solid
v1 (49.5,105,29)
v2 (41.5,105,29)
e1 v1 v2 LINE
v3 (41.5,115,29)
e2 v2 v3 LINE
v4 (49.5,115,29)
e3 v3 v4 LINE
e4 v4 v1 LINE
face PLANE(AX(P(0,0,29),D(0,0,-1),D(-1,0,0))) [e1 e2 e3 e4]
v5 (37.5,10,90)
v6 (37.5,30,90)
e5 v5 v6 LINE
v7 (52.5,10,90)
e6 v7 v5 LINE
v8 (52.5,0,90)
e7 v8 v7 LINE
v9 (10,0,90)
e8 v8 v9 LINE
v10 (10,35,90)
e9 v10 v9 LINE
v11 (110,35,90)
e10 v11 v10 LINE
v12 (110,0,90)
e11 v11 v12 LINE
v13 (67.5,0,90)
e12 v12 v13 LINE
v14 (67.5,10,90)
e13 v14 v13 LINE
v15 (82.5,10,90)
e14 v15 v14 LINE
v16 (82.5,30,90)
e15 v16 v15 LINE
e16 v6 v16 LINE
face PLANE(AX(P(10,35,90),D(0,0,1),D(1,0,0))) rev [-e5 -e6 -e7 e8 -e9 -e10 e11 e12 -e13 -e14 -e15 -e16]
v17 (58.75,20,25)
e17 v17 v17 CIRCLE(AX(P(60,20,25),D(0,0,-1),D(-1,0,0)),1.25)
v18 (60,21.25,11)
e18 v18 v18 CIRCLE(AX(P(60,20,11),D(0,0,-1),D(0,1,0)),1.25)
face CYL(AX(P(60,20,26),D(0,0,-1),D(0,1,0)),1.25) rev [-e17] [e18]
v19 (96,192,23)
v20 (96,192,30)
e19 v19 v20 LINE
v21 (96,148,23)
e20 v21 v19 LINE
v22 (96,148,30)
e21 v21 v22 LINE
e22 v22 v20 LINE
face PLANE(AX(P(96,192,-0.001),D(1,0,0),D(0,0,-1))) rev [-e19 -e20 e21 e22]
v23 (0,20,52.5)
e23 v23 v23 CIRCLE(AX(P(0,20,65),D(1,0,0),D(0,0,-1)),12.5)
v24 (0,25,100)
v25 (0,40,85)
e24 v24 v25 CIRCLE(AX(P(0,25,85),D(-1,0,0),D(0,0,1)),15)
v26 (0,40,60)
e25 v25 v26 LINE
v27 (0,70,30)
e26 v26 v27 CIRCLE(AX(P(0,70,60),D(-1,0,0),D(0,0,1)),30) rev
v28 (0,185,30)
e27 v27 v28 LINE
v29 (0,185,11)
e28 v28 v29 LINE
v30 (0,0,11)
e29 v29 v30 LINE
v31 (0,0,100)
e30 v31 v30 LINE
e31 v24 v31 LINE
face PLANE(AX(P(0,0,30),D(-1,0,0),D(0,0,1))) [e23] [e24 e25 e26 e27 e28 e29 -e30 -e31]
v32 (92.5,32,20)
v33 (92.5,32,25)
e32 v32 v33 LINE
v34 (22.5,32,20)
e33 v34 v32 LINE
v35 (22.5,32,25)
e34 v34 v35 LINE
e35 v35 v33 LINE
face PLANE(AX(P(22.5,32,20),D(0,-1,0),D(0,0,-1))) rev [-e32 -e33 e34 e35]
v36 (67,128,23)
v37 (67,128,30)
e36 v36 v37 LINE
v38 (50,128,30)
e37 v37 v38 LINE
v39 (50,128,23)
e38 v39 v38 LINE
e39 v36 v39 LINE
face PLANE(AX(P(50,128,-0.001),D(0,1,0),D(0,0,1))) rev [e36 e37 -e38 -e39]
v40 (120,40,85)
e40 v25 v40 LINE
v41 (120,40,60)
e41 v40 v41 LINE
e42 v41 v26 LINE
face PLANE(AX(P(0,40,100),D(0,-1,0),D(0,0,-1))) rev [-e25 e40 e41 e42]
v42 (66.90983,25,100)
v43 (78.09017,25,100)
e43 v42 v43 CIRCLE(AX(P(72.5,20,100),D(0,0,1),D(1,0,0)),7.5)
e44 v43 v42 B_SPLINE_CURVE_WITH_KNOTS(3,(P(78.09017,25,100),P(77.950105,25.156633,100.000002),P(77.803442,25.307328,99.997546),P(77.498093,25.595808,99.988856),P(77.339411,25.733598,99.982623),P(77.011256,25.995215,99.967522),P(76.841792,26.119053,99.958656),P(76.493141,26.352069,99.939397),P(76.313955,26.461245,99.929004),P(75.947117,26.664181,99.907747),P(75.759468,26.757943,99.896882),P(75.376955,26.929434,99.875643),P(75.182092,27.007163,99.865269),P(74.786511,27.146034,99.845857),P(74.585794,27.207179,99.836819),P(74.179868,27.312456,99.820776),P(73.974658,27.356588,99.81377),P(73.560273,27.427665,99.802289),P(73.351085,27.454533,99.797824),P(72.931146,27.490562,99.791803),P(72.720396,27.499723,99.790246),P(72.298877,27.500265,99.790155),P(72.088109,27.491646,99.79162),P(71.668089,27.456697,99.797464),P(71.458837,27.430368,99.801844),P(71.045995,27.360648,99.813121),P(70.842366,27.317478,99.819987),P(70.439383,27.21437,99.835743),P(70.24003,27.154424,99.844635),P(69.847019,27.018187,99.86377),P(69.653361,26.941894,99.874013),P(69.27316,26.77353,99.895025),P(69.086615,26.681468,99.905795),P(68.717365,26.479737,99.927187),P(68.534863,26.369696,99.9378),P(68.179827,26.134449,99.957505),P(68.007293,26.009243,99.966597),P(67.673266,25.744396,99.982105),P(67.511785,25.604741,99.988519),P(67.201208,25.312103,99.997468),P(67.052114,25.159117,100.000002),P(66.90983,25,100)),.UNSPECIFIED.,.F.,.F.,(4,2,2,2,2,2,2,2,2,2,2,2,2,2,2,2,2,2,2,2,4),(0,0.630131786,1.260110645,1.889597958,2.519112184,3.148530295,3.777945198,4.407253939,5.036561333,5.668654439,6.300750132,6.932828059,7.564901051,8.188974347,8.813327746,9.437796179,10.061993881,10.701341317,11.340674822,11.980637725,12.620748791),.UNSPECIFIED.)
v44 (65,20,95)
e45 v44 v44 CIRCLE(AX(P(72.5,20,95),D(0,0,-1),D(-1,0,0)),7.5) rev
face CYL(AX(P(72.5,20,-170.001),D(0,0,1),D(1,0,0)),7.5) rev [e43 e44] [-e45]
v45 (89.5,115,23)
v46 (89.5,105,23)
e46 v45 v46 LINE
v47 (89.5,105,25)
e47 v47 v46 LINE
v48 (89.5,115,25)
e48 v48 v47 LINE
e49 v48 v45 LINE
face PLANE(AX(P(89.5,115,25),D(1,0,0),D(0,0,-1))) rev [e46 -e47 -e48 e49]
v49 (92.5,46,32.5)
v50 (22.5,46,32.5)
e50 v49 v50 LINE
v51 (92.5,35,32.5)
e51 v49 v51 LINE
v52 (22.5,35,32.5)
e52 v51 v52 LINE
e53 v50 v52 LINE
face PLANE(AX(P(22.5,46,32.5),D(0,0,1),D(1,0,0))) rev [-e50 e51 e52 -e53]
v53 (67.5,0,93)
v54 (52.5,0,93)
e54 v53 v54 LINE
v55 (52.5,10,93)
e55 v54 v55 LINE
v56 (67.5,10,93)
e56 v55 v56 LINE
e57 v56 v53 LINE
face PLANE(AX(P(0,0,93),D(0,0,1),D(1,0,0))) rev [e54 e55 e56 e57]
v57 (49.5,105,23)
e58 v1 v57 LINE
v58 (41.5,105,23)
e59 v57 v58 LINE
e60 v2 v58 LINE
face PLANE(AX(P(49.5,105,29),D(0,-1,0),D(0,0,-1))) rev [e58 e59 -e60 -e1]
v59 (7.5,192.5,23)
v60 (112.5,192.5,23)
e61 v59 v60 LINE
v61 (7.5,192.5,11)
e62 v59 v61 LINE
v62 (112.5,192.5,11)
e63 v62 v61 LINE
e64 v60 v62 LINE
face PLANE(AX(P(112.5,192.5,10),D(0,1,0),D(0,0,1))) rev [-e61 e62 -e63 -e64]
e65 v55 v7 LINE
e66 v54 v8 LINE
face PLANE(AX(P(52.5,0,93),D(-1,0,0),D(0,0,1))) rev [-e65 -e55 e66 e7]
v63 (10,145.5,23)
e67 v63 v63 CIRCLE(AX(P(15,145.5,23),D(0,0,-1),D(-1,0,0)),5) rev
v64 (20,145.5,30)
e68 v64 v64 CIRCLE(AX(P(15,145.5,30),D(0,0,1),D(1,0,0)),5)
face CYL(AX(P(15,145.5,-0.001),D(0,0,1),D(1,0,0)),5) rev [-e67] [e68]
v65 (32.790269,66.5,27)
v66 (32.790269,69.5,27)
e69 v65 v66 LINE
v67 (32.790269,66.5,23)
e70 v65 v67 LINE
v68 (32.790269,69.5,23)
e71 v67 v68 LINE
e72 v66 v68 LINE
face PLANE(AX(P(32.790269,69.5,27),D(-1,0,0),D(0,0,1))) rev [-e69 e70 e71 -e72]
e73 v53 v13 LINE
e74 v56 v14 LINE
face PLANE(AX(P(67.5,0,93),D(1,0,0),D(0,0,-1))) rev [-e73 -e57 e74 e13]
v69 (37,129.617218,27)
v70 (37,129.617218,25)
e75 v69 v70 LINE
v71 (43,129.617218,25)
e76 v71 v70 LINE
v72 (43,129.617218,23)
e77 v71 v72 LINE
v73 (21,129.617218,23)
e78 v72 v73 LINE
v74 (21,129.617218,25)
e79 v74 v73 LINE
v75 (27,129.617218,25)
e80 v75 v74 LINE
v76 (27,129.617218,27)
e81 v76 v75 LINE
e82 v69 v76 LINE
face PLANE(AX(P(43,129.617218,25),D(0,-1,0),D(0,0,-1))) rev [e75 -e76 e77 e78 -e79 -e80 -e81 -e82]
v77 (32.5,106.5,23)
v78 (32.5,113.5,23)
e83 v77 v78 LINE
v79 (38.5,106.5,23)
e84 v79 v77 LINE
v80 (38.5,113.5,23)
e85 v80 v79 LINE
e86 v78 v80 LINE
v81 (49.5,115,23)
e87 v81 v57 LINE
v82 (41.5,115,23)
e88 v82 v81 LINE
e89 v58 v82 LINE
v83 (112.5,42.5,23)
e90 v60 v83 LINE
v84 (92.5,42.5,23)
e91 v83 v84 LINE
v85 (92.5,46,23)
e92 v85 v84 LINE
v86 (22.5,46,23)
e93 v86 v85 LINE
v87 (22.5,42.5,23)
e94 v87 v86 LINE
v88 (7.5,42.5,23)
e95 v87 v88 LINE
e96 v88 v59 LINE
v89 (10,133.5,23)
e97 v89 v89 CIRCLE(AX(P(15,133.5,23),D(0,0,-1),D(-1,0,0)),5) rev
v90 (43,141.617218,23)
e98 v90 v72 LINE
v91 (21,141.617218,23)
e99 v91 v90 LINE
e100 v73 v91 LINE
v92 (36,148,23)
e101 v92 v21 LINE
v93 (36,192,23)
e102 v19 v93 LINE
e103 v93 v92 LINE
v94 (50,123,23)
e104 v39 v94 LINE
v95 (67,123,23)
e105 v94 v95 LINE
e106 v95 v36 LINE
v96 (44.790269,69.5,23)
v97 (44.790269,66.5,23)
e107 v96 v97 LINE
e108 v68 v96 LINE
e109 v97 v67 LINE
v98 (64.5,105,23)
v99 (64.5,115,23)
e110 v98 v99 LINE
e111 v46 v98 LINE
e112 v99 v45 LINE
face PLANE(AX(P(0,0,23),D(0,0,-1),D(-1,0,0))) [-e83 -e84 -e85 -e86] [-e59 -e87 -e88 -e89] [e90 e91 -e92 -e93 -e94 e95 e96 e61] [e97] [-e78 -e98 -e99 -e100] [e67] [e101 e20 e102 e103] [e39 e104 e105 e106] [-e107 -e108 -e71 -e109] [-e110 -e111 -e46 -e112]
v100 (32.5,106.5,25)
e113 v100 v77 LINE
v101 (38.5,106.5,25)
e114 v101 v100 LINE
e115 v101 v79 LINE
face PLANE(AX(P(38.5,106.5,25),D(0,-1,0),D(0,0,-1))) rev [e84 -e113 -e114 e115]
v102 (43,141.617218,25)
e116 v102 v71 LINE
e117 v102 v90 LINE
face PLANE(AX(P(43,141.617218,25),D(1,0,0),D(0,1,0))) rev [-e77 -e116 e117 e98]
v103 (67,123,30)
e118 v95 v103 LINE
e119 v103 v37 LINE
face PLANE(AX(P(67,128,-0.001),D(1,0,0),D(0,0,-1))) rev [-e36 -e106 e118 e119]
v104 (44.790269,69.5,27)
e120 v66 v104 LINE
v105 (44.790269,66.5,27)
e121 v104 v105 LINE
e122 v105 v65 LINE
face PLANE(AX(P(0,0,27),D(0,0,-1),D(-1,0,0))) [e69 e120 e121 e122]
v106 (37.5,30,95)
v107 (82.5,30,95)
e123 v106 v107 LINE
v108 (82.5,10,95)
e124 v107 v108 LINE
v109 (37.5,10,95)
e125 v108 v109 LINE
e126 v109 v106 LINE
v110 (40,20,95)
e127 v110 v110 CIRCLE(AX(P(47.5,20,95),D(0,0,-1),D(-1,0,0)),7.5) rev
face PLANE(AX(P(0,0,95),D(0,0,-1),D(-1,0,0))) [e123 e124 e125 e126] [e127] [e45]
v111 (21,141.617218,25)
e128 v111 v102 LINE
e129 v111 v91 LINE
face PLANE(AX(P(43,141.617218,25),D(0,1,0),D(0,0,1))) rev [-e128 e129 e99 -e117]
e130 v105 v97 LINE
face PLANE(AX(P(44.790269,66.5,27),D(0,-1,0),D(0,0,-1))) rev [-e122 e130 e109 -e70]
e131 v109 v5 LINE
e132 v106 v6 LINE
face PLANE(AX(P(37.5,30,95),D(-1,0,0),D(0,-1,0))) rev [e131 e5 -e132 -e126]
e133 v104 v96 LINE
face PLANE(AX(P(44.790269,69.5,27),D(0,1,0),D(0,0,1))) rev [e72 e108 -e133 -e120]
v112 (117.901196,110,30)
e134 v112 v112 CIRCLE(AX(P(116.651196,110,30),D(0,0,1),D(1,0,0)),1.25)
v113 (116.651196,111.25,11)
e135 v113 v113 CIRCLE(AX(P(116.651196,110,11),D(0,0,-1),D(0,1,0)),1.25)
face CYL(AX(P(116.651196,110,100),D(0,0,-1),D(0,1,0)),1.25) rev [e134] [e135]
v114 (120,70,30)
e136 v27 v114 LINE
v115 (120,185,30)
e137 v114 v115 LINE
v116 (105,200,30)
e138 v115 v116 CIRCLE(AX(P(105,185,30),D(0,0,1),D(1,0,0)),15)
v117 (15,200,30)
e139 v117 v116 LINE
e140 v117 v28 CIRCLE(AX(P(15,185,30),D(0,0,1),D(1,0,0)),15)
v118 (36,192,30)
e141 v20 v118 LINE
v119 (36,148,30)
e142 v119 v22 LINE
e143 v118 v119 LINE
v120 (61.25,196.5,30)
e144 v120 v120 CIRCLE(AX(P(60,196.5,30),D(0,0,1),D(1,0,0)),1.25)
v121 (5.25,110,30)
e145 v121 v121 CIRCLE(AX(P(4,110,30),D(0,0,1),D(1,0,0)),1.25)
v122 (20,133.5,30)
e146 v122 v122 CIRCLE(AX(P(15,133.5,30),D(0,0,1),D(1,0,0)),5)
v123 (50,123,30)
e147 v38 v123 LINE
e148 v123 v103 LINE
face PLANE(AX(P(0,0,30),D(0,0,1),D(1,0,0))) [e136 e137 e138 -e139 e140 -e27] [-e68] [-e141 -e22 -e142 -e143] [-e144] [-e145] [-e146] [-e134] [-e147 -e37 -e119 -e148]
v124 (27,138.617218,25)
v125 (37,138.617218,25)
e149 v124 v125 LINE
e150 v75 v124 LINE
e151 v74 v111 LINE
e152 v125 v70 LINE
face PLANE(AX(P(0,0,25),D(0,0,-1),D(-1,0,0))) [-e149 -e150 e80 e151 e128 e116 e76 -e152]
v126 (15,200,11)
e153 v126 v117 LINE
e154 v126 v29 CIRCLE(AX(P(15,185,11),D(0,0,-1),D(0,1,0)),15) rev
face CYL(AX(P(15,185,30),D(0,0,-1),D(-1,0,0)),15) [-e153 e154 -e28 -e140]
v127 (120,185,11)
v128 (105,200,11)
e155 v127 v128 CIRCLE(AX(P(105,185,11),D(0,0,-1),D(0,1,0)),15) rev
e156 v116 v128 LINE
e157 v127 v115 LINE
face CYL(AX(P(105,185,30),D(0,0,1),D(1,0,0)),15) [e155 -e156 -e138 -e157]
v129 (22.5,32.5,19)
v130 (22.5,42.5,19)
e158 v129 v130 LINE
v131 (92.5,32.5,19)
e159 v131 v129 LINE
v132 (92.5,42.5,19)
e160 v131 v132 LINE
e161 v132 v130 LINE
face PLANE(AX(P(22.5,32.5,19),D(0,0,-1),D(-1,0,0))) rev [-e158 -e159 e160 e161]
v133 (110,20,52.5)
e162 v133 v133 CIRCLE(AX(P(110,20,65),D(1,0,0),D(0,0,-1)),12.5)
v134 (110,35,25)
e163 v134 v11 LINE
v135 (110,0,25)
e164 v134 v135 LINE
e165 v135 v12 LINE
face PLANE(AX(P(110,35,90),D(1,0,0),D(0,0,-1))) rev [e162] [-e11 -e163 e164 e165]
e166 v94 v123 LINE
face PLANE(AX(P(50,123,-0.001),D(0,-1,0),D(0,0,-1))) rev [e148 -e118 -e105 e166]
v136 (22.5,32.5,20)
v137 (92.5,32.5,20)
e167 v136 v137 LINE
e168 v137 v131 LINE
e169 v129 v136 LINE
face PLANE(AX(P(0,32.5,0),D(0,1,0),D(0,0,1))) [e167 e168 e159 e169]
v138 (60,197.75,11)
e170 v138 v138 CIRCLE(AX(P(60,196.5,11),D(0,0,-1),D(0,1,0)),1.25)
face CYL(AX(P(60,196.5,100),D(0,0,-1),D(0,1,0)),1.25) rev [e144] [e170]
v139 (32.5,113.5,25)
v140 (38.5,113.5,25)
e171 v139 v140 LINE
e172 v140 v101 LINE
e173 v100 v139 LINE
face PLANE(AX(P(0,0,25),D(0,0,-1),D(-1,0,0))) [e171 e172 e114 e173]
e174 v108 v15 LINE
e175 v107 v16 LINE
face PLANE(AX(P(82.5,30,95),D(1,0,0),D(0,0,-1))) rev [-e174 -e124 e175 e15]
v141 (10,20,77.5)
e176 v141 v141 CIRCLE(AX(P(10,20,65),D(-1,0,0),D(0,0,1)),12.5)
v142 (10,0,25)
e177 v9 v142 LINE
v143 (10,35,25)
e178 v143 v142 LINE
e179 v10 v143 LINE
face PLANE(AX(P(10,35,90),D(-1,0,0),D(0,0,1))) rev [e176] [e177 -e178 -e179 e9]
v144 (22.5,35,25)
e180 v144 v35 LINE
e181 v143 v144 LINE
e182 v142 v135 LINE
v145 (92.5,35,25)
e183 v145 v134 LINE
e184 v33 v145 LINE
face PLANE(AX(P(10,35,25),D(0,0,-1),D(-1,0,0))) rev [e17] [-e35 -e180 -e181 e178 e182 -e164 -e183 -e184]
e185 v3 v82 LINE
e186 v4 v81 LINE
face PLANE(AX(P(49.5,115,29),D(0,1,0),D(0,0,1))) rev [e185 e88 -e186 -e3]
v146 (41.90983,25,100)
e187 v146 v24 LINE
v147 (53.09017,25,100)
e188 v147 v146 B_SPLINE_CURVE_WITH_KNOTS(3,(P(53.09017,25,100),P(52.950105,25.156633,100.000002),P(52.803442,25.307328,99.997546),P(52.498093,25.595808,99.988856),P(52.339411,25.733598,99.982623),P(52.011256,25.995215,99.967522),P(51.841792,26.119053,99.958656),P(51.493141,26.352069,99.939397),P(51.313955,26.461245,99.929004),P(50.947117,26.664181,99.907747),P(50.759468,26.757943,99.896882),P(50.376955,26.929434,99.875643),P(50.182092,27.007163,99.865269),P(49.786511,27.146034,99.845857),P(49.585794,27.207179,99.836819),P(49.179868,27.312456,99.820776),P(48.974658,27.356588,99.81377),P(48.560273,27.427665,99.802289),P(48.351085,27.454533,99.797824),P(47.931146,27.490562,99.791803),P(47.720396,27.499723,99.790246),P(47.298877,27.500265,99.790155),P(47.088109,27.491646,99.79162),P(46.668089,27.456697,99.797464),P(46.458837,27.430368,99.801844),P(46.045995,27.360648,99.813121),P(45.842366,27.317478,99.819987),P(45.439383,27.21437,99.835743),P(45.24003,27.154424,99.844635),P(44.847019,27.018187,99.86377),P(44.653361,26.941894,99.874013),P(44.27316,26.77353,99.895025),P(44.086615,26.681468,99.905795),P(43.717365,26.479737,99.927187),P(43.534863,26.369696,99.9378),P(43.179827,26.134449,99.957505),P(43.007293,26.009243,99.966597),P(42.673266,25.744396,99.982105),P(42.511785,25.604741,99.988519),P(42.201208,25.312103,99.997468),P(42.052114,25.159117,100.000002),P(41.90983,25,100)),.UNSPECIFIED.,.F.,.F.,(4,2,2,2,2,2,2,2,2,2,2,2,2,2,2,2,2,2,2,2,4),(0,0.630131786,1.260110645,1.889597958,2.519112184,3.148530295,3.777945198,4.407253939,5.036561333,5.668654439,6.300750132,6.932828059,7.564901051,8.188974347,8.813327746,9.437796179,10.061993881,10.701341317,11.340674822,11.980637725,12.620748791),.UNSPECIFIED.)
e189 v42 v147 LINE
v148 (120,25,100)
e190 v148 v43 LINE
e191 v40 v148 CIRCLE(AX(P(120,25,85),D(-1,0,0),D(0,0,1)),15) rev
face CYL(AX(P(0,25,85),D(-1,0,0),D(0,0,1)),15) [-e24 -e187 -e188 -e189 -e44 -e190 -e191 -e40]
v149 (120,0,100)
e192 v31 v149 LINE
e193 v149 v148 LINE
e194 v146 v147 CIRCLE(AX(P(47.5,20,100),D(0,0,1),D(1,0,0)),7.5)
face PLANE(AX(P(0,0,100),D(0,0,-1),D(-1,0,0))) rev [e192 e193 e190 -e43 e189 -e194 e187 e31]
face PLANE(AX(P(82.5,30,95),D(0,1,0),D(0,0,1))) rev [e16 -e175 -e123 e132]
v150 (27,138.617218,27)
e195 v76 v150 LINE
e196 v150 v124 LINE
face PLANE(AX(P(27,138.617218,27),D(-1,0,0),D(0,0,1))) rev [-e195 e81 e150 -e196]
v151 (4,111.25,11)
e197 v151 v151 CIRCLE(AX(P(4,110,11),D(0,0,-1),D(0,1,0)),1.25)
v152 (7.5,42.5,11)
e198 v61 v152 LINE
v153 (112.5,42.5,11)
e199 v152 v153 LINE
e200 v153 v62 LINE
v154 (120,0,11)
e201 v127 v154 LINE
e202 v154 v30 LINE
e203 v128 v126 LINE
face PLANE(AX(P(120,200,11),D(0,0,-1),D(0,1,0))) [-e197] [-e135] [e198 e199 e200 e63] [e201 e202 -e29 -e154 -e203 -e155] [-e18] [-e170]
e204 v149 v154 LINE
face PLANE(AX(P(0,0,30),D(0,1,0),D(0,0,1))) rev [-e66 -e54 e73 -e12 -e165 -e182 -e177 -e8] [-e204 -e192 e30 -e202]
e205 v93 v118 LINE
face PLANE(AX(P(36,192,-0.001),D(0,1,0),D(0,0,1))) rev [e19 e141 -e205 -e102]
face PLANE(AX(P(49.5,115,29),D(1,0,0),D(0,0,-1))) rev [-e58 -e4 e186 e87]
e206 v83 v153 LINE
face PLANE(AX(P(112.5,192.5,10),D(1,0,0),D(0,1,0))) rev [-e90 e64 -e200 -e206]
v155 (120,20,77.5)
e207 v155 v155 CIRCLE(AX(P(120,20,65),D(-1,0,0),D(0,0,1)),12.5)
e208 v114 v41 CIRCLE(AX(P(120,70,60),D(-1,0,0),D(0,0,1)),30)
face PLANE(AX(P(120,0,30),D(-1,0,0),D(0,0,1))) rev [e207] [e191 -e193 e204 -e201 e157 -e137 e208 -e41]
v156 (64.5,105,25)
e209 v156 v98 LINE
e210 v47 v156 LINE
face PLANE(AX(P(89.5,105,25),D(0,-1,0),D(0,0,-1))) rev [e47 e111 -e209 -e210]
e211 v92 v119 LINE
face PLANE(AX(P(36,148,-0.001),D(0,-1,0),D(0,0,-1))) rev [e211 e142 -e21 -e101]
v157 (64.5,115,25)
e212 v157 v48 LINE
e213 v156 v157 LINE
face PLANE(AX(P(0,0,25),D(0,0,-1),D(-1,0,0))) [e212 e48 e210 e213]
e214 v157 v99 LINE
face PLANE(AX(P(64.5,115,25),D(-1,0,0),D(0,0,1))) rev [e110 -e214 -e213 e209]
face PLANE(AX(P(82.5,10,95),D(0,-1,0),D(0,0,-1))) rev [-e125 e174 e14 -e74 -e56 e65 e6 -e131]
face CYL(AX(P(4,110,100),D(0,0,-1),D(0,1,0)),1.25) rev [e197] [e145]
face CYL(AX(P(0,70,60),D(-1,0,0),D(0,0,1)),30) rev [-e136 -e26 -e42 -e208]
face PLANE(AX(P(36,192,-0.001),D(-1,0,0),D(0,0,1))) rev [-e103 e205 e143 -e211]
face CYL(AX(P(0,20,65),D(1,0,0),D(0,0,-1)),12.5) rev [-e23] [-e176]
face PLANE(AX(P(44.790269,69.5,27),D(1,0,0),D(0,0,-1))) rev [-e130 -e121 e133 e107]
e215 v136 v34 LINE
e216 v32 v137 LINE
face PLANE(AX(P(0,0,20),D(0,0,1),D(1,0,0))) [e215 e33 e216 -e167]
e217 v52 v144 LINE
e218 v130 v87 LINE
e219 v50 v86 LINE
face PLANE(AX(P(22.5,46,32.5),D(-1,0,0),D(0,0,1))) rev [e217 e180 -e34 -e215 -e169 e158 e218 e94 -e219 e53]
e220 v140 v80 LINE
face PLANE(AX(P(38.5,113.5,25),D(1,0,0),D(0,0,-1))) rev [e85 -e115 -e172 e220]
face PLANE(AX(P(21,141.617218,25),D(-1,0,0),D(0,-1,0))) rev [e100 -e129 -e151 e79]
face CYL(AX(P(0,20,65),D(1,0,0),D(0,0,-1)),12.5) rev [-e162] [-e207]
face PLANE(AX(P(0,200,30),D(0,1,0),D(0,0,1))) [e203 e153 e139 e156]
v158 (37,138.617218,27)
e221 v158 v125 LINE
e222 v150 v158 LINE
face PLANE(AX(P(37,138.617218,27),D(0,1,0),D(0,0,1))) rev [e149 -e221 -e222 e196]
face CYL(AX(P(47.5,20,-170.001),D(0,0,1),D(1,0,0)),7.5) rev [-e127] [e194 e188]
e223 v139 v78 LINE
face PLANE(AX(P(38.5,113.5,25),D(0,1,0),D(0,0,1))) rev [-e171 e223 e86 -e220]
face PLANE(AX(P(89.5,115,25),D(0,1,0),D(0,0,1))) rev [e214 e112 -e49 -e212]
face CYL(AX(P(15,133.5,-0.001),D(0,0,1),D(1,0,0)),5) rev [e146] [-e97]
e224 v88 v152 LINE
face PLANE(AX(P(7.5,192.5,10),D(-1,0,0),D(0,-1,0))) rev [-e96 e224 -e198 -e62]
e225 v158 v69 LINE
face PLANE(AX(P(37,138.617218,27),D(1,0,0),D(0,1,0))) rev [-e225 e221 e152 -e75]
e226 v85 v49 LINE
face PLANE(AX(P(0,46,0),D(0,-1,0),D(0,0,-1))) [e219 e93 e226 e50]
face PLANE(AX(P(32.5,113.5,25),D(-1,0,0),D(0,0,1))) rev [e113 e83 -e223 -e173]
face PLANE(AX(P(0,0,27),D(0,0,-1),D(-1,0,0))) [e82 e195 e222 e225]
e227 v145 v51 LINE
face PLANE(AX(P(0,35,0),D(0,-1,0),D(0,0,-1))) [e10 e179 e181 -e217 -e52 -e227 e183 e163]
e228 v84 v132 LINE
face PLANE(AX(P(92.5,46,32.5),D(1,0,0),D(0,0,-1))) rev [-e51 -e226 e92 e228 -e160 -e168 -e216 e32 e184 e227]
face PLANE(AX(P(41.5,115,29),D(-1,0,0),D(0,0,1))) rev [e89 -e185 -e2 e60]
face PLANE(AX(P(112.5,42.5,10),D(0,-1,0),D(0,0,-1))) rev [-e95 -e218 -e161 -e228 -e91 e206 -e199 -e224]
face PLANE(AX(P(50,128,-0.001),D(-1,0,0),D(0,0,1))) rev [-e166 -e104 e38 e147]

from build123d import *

# Parameters (mm, degrees)
ESQUISSE1_W                  = 120
ESQUISSE1_H                  = 200
BOSS_EXTRU_2_DEPTH           = 30
ESQUISSE3_W                  = 120
ESQUISSE3_H                  = 40
BOSS_EXTRU_3_DEPTH           = 70
CONG_1_R                     = 30
ESQUISSE4_W                  = 120
ESQUISSE4_H                  = 40
BOSS_EXTRU_4_DEPTH           = 140
CONG_2_R                     = 15
ESQUISSE5_W                  = 50
ESQUISSE5_H                  = 30
BOSS_EXTRU_9_DEPTH           = 7.5
ESQUISSE7_W                  = 100
ESQUISSE7_H                  = 65
ENL_V_MAT_EXTRU_1_DEPTH      = 35
ENL_V_MAT_EXTRU_7_REACH      = 358.791
ESQUISSE8_R                  = 7.5
ESQUISSE12_W                 = 45
ESQUISSE12_H                 = 20
ENL_V_MAT_EXTRU_8_DEPTH      = 5
ENL_V_MAT_EXTRU_9_DEPTH      = 289.617393793
ENL_V_MAT_EXTRU_9_DEPTH_BACK = 289.617393793
ESQUISSE13_R                 = 12.5
ESQUISSE14_W                 = 15
ESQUISSE14_H                 = 10
ENL_V_MAT_EXTRU_10_DEPTH     = 3
ESQUISSE20_W                 = 142.524843465
ESQUISSE20_H                 = 215.321289932
ENL_V_MAT_EXTRU_11_DEPTH     = 192
ESQUISSE21_W                 = 105
ESQUISSE21_H                 = 150
ENL_V_MAT_EXTRU_12_DEPTH     = 10
ENL_V_MAT_EXTRU_13_REACH     = 245.516
ESQUISSE22_W                 = 60
ESQUISSE22_H                 = 44
ENL_V_MAT_EXTRU_14_REACH     = 245.516
ESQUISSE23_W                 = 17
ESQUISSE23_H                 = 5
ENL_V_MAT_EXTRU_15_REACH     = 245.516
ESQUISSE24_R                 = 5
ESQUISSE25_W                 = 60
ESQUISSE25_H                 = 25
ENL_V_MAT_EXTRU_16_DEPTH     = 5
CONG_3_R                     = 15
ESQUISSE27_W                 = 76
ESQUISSE27_H                 = 44
ENL_V_MAT_EXTRU_18_DEPTH     = 13
ESQUISSE21_2_W               = 105
ESQUISSE21_2_H               = 150
ENL_V_MAT_EXTRU_20_DEPTH     = 20
ESQUISSE21_3_W               = 105
ESQUISSE21_3_H               = 150
ENL_V_MAT_EXTRU_21_DEPTH     = 22
ESQUISSE21_4_W               = 105
ESQUISSE21_4_H               = 150
ENL_V_MAT_EXTRU_22_DEPTH     = 23
ESQUISSE30_W                 = 70
ESQUISSE30_H                 = 7.5
ENL_V_MAT_EXTRU_23_DEPTH     = 11
ESQUISSE31_W                 = 11
ESQUISSE31_H                 = 200
ENL_V_MAT_EXTRU_24_DEPTH     = 254.771550896
ESQUISSE32_W                 = 6
ESQUISSE32_H                 = 7
ENL_V_MAT_EXTRU_25_DEPTH     = 2
ESQUISSE33_W                 = 8
ESQUISSE33_H                 = 10
ENL_V_MAT_EXTRU_26_DEPTH     = 6
ESQUISSE35_W                 = 22
ESQUISSE35_H                 = 12
ENL_V_MAT_EXTRU_27_DEPTH     = 2
ESQUISSE36_W                 = 10
ESQUISSE36_H                 = 9
ENL_V_MAT_EXTRU_28_DEPTH     = 4
ESQUISSE37_W                 = 25
ESQUISSE37_H                 = 10
ENL_V_MAT_EXTRU_29_DEPTH     = 2
ESQUISSE38_W                 = 12
ESQUISSE38_H                 = 3
ENL_V_MAT_EXTRU_30_DEPTH     = 4
ESQUISSE39_W                 = 70
ESQUISSE39_H                 = 4
ENL_V_MAT_EXTRU_31_DEPTH     = 10
ESQUISSE40_W                 = 70
ESQUISSE40_H                 = 14
ENL_V_MAT_EXTRU_32_DEPTH     = 5
ESQUISSE41_R                 = 1.25
ENL_V_MAT_EXTRU_33_DEPTH     = 15
ESQUISSE42_R                 = 1.25
ENL_V_MAT_EXTRU_34_DEPTH     = 250.641743388


with BuildPart() as part:
    # Esquisse1 → Boss.-Extru.2 (new, symmetric)
    with BuildSketch(Plane.XY):
        with Locations((60, 100)):
            Rectangle(ESQUISSE1_W, ESQUISSE1_H)
    extrude(amount=BOSS_EXTRU_2_DEPTH, both=True)

    # Esquisse3 → Boss.-Extru.3 (add)
    with BuildSketch(Plane.XY.offset(30)):
        with Locations((60, 20)):
            Rectangle(ESQUISSE3_W, ESQUISSE3_H)
    extrude(amount=BOSS_EXTRU_3_DEPTH)

    # Congé1
    cong_1_edges = [part.edges().sort_by_distance(p)[0] for p in [
        (60, 40, 30),
    ]]
    fillet(cong_1_edges, radius=CONG_1_R)

    # Esquisse4 → Boss.-Extru.4 (add)
    with BuildSketch(Plane(origin=(0, 0, -30), x_dir=(-1, 0, 0), z_dir=(0, 0, -1))):
        with Locations((-60, 20)):
            Rectangle(ESQUISSE4_W, ESQUISSE4_H)
    extrude(amount=BOSS_EXTRU_4_DEPTH)

    # Congé2
    cong_2_edges = [part.edges().sort_by_distance(p)[0] for p in [
        (60, 40, -30),
    ]]
    fillet(cong_2_edges, radius=CONG_2_R)

    # Esquisse5 → Boss.-Extru.9 (add)
    with BuildSketch(Plane.XY.offset(100)):
        with Locations((60, 20)):
            Rectangle(ESQUISSE5_W, ESQUISSE5_H)
    extrude(amount=-BOSS_EXTRU_9_DEPTH)

    # Esquisse7 → Enlèv. mat.-Extru.1 (cut)
    with BuildSketch(Plane.XZ):
        with Locations((60, 57.5)):
            Rectangle(ESQUISSE7_W, ESQUISSE7_H)
    extrude(amount=-ENL_V_MAT_EXTRU_1_DEPTH, mode=Mode.SUBTRACT)

    # Esquisse8 → Enlèv. mat.-Extru.7 (cut, up to next)
    with BuildSketch(Plane.XY.offset(100), mode=Mode.PRIVATE) as enl_v_mat_extru_7_sk1:
        with Locations((47.5, 20)):
            Circle(ESQUISSE8_R)
    enl_v_mat_extru_7_tool1 = extrude(enl_v_mat_extru_7_sk1.sketch, amount=-ENL_V_MAT_EXTRU_7_REACH, mode=Mode.PRIVATE) & part.part
    # Esquisse8 → Enlèv. mat.-Extru.7 (cut, up to next)
    with BuildSketch(Plane.XY.offset(100), mode=Mode.PRIVATE) as enl_v_mat_extru_7_sk2:
        with Locations((72.5, 20)):
            Circle(ESQUISSE8_R)
    enl_v_mat_extru_7_tool2 = extrude(enl_v_mat_extru_7_sk2.sketch, amount=-ENL_V_MAT_EXTRU_7_REACH, mode=Mode.PRIVATE) & part.part
    add(enl_v_mat_extru_7_tool1.solids().sort_by_distance((47.5, 20, 100))[0], mode=Mode.SUBTRACT)
    add(enl_v_mat_extru_7_tool2.solids().sort_by_distance((72.5, 20, 100))[0], mode=Mode.SUBTRACT)

    # Esquisse12 → Enlèv. mat.-Extru.8 (cut)
    with BuildSketch(Plane(origin=(0, 0, 90), x_dir=(-1, 0, 0), z_dir=(0, 0, -1))):
        with Locations((-60, 20)):
            Rectangle(ESQUISSE12_W, ESQUISSE12_H)
    extrude(amount=-ENL_V_MAT_EXTRU_8_DEPTH, mode=Mode.SUBTRACT)

    # Esquisse13 → Enlèv. mat.-Extru.9 (cut, two sides: drawn at the far end of the back side and taken through both)
    with BuildSketch(Plane(origin=(120, 0, 0), x_dir=(0, 0, -1), z_dir=(1, 0, 0)).offset(-ENL_V_MAT_EXTRU_9_DEPTH_BACK)):
        with Locations((-65, 20)):
            Circle(ESQUISSE13_R)
    extrude(amount=ENL_V_MAT_EXTRU_9_DEPTH + ENL_V_MAT_EXTRU_9_DEPTH_BACK, mode=Mode.SUBTRACT)

    # Esquisse14 → Enlèv. mat.-Extru.10 (cut)
    with BuildSketch(Plane(origin=(0, 0, 90), x_dir=(-1, 0, 0), z_dir=(0, 0, -1))):
        with Locations((-60, 5)):
            Rectangle(ESQUISSE14_W, ESQUISSE14_H)
    extrude(amount=-ENL_V_MAT_EXTRU_10_DEPTH, mode=Mode.SUBTRACT)

    # Esquisse20 → Enlèv. mat.-Extru.11 (cut)
    with BuildSketch(Plane.XY):
        with Locations((67.67012367, 99.581629618)):
            Rectangle(ESQUISSE20_W, ESQUISSE20_H)
    extrude(amount=-ENL_V_MAT_EXTRU_11_DEPTH, mode=Mode.SUBTRACT)

    # Esquisse21 → Enlèv. mat.-Extru.12 (cut)
    with BuildSketch(Plane(origin=(0, 0, 0), x_dir=(-1, 0, 0), z_dir=(0, 0, -1))):
        with Locations((-60, 117.5)):
            Rectangle(ESQUISSE21_W, ESQUISSE21_H)
    extrude(amount=-ENL_V_MAT_EXTRU_12_DEPTH, mode=Mode.SUBTRACT)

    # Esquisse22 → Enlèv. mat.-Extru.13 (cut, up to next)
    with BuildSketch(Plane.XY.offset(30), mode=Mode.PRIVATE) as enl_v_mat_extru_13_sk1:
        with Locations((66, 170)):
            Rectangle(ESQUISSE22_W, ESQUISSE22_H)
    enl_v_mat_extru_13_tool1 = extrude(enl_v_mat_extru_13_sk1.sketch, amount=-ENL_V_MAT_EXTRU_13_REACH, mode=Mode.PRIVATE) & part.part
    add(enl_v_mat_extru_13_tool1.solids().sort_by_distance((66, 170, 30))[0], mode=Mode.SUBTRACT)

    # Esquisse23 → Enlèv. mat.-Extru.14 (cut, up to next)
    with BuildSketch(Plane.XY.offset(30), mode=Mode.PRIVATE) as enl_v_mat_extru_14_sk1:
        with Locations((58.5, 125.5)):
            Rectangle(ESQUISSE23_W, ESQUISSE23_H)
    enl_v_mat_extru_14_tool1 = extrude(enl_v_mat_extru_14_sk1.sketch, amount=-ENL_V_MAT_EXTRU_14_REACH, mode=Mode.PRIVATE) & part.part
    add(enl_v_mat_extru_14_tool1.solids().sort_by_distance((58.5, 125.5, 30))[0], mode=Mode.SUBTRACT)

    # Esquisse24 → Enlèv. mat.-Extru.15 (cut, up to next)
    with BuildSketch(Plane.XY.offset(30), mode=Mode.PRIVATE) as enl_v_mat_extru_15_sk1:
        with Locations((15, 145.5)):
            Circle(ESQUISSE24_R)
    enl_v_mat_extru_15_tool1 = extrude(enl_v_mat_extru_15_sk1.sketch, amount=-ENL_V_MAT_EXTRU_15_REACH, mode=Mode.PRIVATE) & part.part
    # Esquisse24 → Enlèv. mat.-Extru.15 (cut, up to next)
    with BuildSketch(Plane.XY.offset(30), mode=Mode.PRIVATE) as enl_v_mat_extru_15_sk2:
        with Locations((15, 133.5)):
            Circle(ESQUISSE24_R)
    enl_v_mat_extru_15_tool2 = extrude(enl_v_mat_extru_15_sk2.sketch, amount=-ENL_V_MAT_EXTRU_15_REACH, mode=Mode.PRIVATE) & part.part
    add(enl_v_mat_extru_15_tool1.solids().sort_by_distance((15, 145.5, 30))[0], mode=Mode.SUBTRACT)
    add(enl_v_mat_extru_15_tool2.solids().sort_by_distance((15, 133.5, 30))[0], mode=Mode.SUBTRACT)

    # Esquisse25 → Enlèv. mat.-Extru.16 (cut)
    with BuildSketch(Plane(origin=(0, 0, 10), x_dir=(-1, 0, 0), z_dir=(0, 0, -1))):
        with Locations((-62.5, 95.5)):
            Rectangle(ESQUISSE25_W, ESQUISSE25_H)
    extrude(amount=-ENL_V_MAT_EXTRU_16_DEPTH, mode=Mode.SUBTRACT)

    # Congé3
    # the kernel refuses this fillet: 15 mm, written as the material it takes off along each edge
    with BuildSketch(Plane(origin=(157.5, 40, 100), x_dir=(0, 0, -1), z_dir=(-1, 0, 0))) as cong_3_piece_1:
        with BuildLine():
            CenterArc((CONG_3_R, CONG_3_R), CONG_3_R, 180, 90)
            Line((0, CONG_3_R), (0, 0))
            Line((0, 0), (CONG_3_R, 0))
        make_face()
    extrude(amount=195, mode=Mode.SUBTRACT)
    with BuildSketch(Plane(origin=(0, 200, 67.5), x_dir=(0, -1, 0), z_dir=(0, 0, -1))) as cong_3_piece_2:
        with BuildLine():
            CenterArc((CONG_3_R, -CONG_3_R), CONG_3_R, 90, 90)
            Line((0, -CONG_3_R), (0, 0))
            Line((0, 0), (CONG_3_R, 0))
        make_face()
    extrude(amount=105, mode=Mode.SUBTRACT)
    with BuildSketch(Plane(origin=(120, 200, -37.5), x_dir=(-1, 0, 0), z_dir=(0, 0, 1))) as cong_3_piece_3:
        with BuildLine():
            CenterArc((CONG_3_R, CONG_3_R), CONG_3_R, 180, 90)
            Line((0, CONG_3_R), (0, 0))
            Line((0, 0), (CONG_3_R, 0))
        make_face()
    extrude(amount=105, mode=Mode.SUBTRACT)

    # Esquisse27 → Enlèv. mat.-Extru.18 (cut)
    with BuildSketch(Plane(origin=(0, 0, 10), x_dir=(-1, 0, 0), z_dir=(0, 0, -1))):
        with Locations((-63, 170)):
            Rectangle(ESQUISSE27_W, ESQUISSE27_H)
    extrude(amount=-ENL_V_MAT_EXTRU_18_DEPTH, mode=Mode.SUBTRACT)

    # Esquisse21<2> → Enlèv. mat.-Extru.20 (cut)
    with BuildSketch(Plane(origin=(0, 0, 0), x_dir=(-1, 0, 0), z_dir=(0, 0, -1))):
        with Locations((-60, 117.5)):
            Rectangle(ESQUISSE21_2_W, ESQUISSE21_2_H)
    extrude(amount=-ENL_V_MAT_EXTRU_20_DEPTH, mode=Mode.SUBTRACT)

    # Esquisse21<3> → Enlèv. mat.-Extru.21 (cut)
    with BuildSketch(Plane(origin=(0, 0, 0), x_dir=(-1, 0, 0), z_dir=(0, 0, -1))):
        with Locations((-60, 117.5)):
            Rectangle(ESQUISSE21_3_W, ESQUISSE21_3_H)
    extrude(amount=-ENL_V_MAT_EXTRU_21_DEPTH, mode=Mode.SUBTRACT)

    # Esquisse21<4> → Enlèv. mat.-Extru.22 (cut)
    with BuildSketch(Plane(origin=(0, 0, 0), x_dir=(-1, 0, 0), z_dir=(0, 0, -1))):
        with Locations((-60, 117.5)):
            Rectangle(ESQUISSE21_4_W, ESQUISSE21_4_H)
    extrude(amount=-ENL_V_MAT_EXTRU_22_DEPTH, mode=Mode.SUBTRACT)

    # Esquisse30 → Enlèv. mat.-Extru.23 (cut)
    with BuildSketch(Plane.XZ.offset(-35)):
        with Locations((57.5, 28.75)):
            Rectangle(ESQUISSE30_W, ESQUISSE30_H)
    extrude(amount=-ENL_V_MAT_EXTRU_23_DEPTH, mode=Mode.SUBTRACT)

    # Esquisse31 → Enlèv. mat.-Extru.24 (cut, through all)
    with BuildSketch(Plane(origin=(0, 0, 0), x_dir=(0, 0, -1), z_dir=(1, 0, 0))):
        with Locations((-5.5, 100)):
            Rectangle(ESQUISSE31_W, ESQUISSE31_H)
    extrude(amount=ENL_V_MAT_EXTRU_24_DEPTH, mode=Mode.SUBTRACT)

    # Esquisse32 → Enlèv. mat.-Extru.25 (cut)
    with BuildSketch(Plane(origin=(0, 0, 23), x_dir=(-1, 0, 0), z_dir=(0, 0, -1))):
        with Locations((-35.5, 110)):
            Rectangle(ESQUISSE32_W, ESQUISSE32_H)
    extrude(amount=-ENL_V_MAT_EXTRU_25_DEPTH, mode=Mode.SUBTRACT)

    # Esquisse33 → Enlèv. mat.-Extru.26 (cut)
    with BuildSketch(Plane(origin=(0, 0, 23), x_dir=(-1, 0, 0), z_dir=(0, 0, -1))):
        with Locations((-45.5, 110)):
            Rectangle(ESQUISSE33_W, ESQUISSE33_H)
    extrude(amount=-ENL_V_MAT_EXTRU_26_DEPTH, mode=Mode.SUBTRACT)

    # Esquisse35 → Enlèv. mat.-Extru.27 (cut)
    with BuildSketch(Plane(origin=(0, 0, 23), x_dir=(-1, 0, 0), z_dir=(0, 0, -1))):
        with Locations((-32, 135.617217642)):
            Rectangle(ESQUISSE35_W, ESQUISSE35_H)
    extrude(amount=-ENL_V_MAT_EXTRU_27_DEPTH, mode=Mode.SUBTRACT)

    # Esquisse36 → Enlèv. mat.-Extru.28 (cut)
    with BuildSketch(Plane(origin=(0, 0, 23), x_dir=(-1, 0, 0), z_dir=(0, 0, -1))):
        with Locations((-32, 134.117217642)):
            Rectangle(ESQUISSE36_W, ESQUISSE36_H)
    extrude(amount=-ENL_V_MAT_EXTRU_28_DEPTH, mode=Mode.SUBTRACT)

    # Esquisse37 → Enlèv. mat.-Extru.29 (cut)
    with BuildSketch(Plane(origin=(0, 0, 23), x_dir=(-1, 0, 0), z_dir=(0, 0, -1))):
        with Locations((-77, 110)):
            Rectangle(ESQUISSE37_W, ESQUISSE37_H)
    extrude(amount=-ENL_V_MAT_EXTRU_29_DEPTH, mode=Mode.SUBTRACT)

    # Esquisse38 → Enlèv. mat.-Extru.30 (cut)
    with BuildSketch(Plane(origin=(0, 0, 23), x_dir=(-1, 0, 0), z_dir=(0, 0, -1))):
        with Locations((-38.790269329, 68)):
            Rectangle(ESQUISSE38_W, ESQUISSE38_H)
    extrude(amount=-ENL_V_MAT_EXTRU_30_DEPTH, mode=Mode.SUBTRACT)

    # Esquisse39 → Enlèv. mat.-Extru.31 (cut)
    with BuildSketch(Plane(origin=(0, 42.5, 0), x_dir=(1, 0, 0), z_dir=(0, 1, 0))):
        with Locations((57.5, -21)):
            Rectangle(ESQUISSE39_W, ESQUISSE39_H)
    extrude(amount=-ENL_V_MAT_EXTRU_31_DEPTH, mode=Mode.SUBTRACT)

    # Esquisse40 → Enlèv. mat.-Extru.32 (cut)
    with BuildSketch(Plane.XY.offset(25)):
        with Locations((57.5, 39)):
            Rectangle(ESQUISSE40_W, ESQUISSE40_H)
    extrude(amount=-ENL_V_MAT_EXTRU_32_DEPTH, mode=Mode.SUBTRACT)

    # Esquisse41 → Enlèv. mat.-Extru.33 (cut)
    with BuildSketch(Plane(origin=(0, 0, 11), x_dir=(-1, 0, 0), z_dir=(0, 0, -1))):
        with Locations(Location((-60, 20, 0), (0, 0, 90))):
            Circle(ESQUISSE41_R)
    extrude(amount=-ENL_V_MAT_EXTRU_33_DEPTH, mode=Mode.SUBTRACT)

    # Esquisse42 → Enlèv. mat.-Extru.34 (cut, through all)
    with BuildSketch(Plane(origin=(0, 0, 11), x_dir=(-1, 0, 0), z_dir=(0, 0, -1))):
        with Locations(Location((-116.651195727, 110, 0), (0, 0, 90))):
            Circle(ESQUISSE42_R)
        with Locations(Location((-4, 110, 0), (0, 0, 90))):
            Circle(ESQUISSE42_R)
        with Locations(Location((-60, 196.5, 0), (0, 0, 90))):
            Circle(ESQUISSE42_R)
    extrude(amount=-ENL_V_MAT_EXTRU_34_DEPTH, mode=Mode.SUBTRACT)


solid = part.part
